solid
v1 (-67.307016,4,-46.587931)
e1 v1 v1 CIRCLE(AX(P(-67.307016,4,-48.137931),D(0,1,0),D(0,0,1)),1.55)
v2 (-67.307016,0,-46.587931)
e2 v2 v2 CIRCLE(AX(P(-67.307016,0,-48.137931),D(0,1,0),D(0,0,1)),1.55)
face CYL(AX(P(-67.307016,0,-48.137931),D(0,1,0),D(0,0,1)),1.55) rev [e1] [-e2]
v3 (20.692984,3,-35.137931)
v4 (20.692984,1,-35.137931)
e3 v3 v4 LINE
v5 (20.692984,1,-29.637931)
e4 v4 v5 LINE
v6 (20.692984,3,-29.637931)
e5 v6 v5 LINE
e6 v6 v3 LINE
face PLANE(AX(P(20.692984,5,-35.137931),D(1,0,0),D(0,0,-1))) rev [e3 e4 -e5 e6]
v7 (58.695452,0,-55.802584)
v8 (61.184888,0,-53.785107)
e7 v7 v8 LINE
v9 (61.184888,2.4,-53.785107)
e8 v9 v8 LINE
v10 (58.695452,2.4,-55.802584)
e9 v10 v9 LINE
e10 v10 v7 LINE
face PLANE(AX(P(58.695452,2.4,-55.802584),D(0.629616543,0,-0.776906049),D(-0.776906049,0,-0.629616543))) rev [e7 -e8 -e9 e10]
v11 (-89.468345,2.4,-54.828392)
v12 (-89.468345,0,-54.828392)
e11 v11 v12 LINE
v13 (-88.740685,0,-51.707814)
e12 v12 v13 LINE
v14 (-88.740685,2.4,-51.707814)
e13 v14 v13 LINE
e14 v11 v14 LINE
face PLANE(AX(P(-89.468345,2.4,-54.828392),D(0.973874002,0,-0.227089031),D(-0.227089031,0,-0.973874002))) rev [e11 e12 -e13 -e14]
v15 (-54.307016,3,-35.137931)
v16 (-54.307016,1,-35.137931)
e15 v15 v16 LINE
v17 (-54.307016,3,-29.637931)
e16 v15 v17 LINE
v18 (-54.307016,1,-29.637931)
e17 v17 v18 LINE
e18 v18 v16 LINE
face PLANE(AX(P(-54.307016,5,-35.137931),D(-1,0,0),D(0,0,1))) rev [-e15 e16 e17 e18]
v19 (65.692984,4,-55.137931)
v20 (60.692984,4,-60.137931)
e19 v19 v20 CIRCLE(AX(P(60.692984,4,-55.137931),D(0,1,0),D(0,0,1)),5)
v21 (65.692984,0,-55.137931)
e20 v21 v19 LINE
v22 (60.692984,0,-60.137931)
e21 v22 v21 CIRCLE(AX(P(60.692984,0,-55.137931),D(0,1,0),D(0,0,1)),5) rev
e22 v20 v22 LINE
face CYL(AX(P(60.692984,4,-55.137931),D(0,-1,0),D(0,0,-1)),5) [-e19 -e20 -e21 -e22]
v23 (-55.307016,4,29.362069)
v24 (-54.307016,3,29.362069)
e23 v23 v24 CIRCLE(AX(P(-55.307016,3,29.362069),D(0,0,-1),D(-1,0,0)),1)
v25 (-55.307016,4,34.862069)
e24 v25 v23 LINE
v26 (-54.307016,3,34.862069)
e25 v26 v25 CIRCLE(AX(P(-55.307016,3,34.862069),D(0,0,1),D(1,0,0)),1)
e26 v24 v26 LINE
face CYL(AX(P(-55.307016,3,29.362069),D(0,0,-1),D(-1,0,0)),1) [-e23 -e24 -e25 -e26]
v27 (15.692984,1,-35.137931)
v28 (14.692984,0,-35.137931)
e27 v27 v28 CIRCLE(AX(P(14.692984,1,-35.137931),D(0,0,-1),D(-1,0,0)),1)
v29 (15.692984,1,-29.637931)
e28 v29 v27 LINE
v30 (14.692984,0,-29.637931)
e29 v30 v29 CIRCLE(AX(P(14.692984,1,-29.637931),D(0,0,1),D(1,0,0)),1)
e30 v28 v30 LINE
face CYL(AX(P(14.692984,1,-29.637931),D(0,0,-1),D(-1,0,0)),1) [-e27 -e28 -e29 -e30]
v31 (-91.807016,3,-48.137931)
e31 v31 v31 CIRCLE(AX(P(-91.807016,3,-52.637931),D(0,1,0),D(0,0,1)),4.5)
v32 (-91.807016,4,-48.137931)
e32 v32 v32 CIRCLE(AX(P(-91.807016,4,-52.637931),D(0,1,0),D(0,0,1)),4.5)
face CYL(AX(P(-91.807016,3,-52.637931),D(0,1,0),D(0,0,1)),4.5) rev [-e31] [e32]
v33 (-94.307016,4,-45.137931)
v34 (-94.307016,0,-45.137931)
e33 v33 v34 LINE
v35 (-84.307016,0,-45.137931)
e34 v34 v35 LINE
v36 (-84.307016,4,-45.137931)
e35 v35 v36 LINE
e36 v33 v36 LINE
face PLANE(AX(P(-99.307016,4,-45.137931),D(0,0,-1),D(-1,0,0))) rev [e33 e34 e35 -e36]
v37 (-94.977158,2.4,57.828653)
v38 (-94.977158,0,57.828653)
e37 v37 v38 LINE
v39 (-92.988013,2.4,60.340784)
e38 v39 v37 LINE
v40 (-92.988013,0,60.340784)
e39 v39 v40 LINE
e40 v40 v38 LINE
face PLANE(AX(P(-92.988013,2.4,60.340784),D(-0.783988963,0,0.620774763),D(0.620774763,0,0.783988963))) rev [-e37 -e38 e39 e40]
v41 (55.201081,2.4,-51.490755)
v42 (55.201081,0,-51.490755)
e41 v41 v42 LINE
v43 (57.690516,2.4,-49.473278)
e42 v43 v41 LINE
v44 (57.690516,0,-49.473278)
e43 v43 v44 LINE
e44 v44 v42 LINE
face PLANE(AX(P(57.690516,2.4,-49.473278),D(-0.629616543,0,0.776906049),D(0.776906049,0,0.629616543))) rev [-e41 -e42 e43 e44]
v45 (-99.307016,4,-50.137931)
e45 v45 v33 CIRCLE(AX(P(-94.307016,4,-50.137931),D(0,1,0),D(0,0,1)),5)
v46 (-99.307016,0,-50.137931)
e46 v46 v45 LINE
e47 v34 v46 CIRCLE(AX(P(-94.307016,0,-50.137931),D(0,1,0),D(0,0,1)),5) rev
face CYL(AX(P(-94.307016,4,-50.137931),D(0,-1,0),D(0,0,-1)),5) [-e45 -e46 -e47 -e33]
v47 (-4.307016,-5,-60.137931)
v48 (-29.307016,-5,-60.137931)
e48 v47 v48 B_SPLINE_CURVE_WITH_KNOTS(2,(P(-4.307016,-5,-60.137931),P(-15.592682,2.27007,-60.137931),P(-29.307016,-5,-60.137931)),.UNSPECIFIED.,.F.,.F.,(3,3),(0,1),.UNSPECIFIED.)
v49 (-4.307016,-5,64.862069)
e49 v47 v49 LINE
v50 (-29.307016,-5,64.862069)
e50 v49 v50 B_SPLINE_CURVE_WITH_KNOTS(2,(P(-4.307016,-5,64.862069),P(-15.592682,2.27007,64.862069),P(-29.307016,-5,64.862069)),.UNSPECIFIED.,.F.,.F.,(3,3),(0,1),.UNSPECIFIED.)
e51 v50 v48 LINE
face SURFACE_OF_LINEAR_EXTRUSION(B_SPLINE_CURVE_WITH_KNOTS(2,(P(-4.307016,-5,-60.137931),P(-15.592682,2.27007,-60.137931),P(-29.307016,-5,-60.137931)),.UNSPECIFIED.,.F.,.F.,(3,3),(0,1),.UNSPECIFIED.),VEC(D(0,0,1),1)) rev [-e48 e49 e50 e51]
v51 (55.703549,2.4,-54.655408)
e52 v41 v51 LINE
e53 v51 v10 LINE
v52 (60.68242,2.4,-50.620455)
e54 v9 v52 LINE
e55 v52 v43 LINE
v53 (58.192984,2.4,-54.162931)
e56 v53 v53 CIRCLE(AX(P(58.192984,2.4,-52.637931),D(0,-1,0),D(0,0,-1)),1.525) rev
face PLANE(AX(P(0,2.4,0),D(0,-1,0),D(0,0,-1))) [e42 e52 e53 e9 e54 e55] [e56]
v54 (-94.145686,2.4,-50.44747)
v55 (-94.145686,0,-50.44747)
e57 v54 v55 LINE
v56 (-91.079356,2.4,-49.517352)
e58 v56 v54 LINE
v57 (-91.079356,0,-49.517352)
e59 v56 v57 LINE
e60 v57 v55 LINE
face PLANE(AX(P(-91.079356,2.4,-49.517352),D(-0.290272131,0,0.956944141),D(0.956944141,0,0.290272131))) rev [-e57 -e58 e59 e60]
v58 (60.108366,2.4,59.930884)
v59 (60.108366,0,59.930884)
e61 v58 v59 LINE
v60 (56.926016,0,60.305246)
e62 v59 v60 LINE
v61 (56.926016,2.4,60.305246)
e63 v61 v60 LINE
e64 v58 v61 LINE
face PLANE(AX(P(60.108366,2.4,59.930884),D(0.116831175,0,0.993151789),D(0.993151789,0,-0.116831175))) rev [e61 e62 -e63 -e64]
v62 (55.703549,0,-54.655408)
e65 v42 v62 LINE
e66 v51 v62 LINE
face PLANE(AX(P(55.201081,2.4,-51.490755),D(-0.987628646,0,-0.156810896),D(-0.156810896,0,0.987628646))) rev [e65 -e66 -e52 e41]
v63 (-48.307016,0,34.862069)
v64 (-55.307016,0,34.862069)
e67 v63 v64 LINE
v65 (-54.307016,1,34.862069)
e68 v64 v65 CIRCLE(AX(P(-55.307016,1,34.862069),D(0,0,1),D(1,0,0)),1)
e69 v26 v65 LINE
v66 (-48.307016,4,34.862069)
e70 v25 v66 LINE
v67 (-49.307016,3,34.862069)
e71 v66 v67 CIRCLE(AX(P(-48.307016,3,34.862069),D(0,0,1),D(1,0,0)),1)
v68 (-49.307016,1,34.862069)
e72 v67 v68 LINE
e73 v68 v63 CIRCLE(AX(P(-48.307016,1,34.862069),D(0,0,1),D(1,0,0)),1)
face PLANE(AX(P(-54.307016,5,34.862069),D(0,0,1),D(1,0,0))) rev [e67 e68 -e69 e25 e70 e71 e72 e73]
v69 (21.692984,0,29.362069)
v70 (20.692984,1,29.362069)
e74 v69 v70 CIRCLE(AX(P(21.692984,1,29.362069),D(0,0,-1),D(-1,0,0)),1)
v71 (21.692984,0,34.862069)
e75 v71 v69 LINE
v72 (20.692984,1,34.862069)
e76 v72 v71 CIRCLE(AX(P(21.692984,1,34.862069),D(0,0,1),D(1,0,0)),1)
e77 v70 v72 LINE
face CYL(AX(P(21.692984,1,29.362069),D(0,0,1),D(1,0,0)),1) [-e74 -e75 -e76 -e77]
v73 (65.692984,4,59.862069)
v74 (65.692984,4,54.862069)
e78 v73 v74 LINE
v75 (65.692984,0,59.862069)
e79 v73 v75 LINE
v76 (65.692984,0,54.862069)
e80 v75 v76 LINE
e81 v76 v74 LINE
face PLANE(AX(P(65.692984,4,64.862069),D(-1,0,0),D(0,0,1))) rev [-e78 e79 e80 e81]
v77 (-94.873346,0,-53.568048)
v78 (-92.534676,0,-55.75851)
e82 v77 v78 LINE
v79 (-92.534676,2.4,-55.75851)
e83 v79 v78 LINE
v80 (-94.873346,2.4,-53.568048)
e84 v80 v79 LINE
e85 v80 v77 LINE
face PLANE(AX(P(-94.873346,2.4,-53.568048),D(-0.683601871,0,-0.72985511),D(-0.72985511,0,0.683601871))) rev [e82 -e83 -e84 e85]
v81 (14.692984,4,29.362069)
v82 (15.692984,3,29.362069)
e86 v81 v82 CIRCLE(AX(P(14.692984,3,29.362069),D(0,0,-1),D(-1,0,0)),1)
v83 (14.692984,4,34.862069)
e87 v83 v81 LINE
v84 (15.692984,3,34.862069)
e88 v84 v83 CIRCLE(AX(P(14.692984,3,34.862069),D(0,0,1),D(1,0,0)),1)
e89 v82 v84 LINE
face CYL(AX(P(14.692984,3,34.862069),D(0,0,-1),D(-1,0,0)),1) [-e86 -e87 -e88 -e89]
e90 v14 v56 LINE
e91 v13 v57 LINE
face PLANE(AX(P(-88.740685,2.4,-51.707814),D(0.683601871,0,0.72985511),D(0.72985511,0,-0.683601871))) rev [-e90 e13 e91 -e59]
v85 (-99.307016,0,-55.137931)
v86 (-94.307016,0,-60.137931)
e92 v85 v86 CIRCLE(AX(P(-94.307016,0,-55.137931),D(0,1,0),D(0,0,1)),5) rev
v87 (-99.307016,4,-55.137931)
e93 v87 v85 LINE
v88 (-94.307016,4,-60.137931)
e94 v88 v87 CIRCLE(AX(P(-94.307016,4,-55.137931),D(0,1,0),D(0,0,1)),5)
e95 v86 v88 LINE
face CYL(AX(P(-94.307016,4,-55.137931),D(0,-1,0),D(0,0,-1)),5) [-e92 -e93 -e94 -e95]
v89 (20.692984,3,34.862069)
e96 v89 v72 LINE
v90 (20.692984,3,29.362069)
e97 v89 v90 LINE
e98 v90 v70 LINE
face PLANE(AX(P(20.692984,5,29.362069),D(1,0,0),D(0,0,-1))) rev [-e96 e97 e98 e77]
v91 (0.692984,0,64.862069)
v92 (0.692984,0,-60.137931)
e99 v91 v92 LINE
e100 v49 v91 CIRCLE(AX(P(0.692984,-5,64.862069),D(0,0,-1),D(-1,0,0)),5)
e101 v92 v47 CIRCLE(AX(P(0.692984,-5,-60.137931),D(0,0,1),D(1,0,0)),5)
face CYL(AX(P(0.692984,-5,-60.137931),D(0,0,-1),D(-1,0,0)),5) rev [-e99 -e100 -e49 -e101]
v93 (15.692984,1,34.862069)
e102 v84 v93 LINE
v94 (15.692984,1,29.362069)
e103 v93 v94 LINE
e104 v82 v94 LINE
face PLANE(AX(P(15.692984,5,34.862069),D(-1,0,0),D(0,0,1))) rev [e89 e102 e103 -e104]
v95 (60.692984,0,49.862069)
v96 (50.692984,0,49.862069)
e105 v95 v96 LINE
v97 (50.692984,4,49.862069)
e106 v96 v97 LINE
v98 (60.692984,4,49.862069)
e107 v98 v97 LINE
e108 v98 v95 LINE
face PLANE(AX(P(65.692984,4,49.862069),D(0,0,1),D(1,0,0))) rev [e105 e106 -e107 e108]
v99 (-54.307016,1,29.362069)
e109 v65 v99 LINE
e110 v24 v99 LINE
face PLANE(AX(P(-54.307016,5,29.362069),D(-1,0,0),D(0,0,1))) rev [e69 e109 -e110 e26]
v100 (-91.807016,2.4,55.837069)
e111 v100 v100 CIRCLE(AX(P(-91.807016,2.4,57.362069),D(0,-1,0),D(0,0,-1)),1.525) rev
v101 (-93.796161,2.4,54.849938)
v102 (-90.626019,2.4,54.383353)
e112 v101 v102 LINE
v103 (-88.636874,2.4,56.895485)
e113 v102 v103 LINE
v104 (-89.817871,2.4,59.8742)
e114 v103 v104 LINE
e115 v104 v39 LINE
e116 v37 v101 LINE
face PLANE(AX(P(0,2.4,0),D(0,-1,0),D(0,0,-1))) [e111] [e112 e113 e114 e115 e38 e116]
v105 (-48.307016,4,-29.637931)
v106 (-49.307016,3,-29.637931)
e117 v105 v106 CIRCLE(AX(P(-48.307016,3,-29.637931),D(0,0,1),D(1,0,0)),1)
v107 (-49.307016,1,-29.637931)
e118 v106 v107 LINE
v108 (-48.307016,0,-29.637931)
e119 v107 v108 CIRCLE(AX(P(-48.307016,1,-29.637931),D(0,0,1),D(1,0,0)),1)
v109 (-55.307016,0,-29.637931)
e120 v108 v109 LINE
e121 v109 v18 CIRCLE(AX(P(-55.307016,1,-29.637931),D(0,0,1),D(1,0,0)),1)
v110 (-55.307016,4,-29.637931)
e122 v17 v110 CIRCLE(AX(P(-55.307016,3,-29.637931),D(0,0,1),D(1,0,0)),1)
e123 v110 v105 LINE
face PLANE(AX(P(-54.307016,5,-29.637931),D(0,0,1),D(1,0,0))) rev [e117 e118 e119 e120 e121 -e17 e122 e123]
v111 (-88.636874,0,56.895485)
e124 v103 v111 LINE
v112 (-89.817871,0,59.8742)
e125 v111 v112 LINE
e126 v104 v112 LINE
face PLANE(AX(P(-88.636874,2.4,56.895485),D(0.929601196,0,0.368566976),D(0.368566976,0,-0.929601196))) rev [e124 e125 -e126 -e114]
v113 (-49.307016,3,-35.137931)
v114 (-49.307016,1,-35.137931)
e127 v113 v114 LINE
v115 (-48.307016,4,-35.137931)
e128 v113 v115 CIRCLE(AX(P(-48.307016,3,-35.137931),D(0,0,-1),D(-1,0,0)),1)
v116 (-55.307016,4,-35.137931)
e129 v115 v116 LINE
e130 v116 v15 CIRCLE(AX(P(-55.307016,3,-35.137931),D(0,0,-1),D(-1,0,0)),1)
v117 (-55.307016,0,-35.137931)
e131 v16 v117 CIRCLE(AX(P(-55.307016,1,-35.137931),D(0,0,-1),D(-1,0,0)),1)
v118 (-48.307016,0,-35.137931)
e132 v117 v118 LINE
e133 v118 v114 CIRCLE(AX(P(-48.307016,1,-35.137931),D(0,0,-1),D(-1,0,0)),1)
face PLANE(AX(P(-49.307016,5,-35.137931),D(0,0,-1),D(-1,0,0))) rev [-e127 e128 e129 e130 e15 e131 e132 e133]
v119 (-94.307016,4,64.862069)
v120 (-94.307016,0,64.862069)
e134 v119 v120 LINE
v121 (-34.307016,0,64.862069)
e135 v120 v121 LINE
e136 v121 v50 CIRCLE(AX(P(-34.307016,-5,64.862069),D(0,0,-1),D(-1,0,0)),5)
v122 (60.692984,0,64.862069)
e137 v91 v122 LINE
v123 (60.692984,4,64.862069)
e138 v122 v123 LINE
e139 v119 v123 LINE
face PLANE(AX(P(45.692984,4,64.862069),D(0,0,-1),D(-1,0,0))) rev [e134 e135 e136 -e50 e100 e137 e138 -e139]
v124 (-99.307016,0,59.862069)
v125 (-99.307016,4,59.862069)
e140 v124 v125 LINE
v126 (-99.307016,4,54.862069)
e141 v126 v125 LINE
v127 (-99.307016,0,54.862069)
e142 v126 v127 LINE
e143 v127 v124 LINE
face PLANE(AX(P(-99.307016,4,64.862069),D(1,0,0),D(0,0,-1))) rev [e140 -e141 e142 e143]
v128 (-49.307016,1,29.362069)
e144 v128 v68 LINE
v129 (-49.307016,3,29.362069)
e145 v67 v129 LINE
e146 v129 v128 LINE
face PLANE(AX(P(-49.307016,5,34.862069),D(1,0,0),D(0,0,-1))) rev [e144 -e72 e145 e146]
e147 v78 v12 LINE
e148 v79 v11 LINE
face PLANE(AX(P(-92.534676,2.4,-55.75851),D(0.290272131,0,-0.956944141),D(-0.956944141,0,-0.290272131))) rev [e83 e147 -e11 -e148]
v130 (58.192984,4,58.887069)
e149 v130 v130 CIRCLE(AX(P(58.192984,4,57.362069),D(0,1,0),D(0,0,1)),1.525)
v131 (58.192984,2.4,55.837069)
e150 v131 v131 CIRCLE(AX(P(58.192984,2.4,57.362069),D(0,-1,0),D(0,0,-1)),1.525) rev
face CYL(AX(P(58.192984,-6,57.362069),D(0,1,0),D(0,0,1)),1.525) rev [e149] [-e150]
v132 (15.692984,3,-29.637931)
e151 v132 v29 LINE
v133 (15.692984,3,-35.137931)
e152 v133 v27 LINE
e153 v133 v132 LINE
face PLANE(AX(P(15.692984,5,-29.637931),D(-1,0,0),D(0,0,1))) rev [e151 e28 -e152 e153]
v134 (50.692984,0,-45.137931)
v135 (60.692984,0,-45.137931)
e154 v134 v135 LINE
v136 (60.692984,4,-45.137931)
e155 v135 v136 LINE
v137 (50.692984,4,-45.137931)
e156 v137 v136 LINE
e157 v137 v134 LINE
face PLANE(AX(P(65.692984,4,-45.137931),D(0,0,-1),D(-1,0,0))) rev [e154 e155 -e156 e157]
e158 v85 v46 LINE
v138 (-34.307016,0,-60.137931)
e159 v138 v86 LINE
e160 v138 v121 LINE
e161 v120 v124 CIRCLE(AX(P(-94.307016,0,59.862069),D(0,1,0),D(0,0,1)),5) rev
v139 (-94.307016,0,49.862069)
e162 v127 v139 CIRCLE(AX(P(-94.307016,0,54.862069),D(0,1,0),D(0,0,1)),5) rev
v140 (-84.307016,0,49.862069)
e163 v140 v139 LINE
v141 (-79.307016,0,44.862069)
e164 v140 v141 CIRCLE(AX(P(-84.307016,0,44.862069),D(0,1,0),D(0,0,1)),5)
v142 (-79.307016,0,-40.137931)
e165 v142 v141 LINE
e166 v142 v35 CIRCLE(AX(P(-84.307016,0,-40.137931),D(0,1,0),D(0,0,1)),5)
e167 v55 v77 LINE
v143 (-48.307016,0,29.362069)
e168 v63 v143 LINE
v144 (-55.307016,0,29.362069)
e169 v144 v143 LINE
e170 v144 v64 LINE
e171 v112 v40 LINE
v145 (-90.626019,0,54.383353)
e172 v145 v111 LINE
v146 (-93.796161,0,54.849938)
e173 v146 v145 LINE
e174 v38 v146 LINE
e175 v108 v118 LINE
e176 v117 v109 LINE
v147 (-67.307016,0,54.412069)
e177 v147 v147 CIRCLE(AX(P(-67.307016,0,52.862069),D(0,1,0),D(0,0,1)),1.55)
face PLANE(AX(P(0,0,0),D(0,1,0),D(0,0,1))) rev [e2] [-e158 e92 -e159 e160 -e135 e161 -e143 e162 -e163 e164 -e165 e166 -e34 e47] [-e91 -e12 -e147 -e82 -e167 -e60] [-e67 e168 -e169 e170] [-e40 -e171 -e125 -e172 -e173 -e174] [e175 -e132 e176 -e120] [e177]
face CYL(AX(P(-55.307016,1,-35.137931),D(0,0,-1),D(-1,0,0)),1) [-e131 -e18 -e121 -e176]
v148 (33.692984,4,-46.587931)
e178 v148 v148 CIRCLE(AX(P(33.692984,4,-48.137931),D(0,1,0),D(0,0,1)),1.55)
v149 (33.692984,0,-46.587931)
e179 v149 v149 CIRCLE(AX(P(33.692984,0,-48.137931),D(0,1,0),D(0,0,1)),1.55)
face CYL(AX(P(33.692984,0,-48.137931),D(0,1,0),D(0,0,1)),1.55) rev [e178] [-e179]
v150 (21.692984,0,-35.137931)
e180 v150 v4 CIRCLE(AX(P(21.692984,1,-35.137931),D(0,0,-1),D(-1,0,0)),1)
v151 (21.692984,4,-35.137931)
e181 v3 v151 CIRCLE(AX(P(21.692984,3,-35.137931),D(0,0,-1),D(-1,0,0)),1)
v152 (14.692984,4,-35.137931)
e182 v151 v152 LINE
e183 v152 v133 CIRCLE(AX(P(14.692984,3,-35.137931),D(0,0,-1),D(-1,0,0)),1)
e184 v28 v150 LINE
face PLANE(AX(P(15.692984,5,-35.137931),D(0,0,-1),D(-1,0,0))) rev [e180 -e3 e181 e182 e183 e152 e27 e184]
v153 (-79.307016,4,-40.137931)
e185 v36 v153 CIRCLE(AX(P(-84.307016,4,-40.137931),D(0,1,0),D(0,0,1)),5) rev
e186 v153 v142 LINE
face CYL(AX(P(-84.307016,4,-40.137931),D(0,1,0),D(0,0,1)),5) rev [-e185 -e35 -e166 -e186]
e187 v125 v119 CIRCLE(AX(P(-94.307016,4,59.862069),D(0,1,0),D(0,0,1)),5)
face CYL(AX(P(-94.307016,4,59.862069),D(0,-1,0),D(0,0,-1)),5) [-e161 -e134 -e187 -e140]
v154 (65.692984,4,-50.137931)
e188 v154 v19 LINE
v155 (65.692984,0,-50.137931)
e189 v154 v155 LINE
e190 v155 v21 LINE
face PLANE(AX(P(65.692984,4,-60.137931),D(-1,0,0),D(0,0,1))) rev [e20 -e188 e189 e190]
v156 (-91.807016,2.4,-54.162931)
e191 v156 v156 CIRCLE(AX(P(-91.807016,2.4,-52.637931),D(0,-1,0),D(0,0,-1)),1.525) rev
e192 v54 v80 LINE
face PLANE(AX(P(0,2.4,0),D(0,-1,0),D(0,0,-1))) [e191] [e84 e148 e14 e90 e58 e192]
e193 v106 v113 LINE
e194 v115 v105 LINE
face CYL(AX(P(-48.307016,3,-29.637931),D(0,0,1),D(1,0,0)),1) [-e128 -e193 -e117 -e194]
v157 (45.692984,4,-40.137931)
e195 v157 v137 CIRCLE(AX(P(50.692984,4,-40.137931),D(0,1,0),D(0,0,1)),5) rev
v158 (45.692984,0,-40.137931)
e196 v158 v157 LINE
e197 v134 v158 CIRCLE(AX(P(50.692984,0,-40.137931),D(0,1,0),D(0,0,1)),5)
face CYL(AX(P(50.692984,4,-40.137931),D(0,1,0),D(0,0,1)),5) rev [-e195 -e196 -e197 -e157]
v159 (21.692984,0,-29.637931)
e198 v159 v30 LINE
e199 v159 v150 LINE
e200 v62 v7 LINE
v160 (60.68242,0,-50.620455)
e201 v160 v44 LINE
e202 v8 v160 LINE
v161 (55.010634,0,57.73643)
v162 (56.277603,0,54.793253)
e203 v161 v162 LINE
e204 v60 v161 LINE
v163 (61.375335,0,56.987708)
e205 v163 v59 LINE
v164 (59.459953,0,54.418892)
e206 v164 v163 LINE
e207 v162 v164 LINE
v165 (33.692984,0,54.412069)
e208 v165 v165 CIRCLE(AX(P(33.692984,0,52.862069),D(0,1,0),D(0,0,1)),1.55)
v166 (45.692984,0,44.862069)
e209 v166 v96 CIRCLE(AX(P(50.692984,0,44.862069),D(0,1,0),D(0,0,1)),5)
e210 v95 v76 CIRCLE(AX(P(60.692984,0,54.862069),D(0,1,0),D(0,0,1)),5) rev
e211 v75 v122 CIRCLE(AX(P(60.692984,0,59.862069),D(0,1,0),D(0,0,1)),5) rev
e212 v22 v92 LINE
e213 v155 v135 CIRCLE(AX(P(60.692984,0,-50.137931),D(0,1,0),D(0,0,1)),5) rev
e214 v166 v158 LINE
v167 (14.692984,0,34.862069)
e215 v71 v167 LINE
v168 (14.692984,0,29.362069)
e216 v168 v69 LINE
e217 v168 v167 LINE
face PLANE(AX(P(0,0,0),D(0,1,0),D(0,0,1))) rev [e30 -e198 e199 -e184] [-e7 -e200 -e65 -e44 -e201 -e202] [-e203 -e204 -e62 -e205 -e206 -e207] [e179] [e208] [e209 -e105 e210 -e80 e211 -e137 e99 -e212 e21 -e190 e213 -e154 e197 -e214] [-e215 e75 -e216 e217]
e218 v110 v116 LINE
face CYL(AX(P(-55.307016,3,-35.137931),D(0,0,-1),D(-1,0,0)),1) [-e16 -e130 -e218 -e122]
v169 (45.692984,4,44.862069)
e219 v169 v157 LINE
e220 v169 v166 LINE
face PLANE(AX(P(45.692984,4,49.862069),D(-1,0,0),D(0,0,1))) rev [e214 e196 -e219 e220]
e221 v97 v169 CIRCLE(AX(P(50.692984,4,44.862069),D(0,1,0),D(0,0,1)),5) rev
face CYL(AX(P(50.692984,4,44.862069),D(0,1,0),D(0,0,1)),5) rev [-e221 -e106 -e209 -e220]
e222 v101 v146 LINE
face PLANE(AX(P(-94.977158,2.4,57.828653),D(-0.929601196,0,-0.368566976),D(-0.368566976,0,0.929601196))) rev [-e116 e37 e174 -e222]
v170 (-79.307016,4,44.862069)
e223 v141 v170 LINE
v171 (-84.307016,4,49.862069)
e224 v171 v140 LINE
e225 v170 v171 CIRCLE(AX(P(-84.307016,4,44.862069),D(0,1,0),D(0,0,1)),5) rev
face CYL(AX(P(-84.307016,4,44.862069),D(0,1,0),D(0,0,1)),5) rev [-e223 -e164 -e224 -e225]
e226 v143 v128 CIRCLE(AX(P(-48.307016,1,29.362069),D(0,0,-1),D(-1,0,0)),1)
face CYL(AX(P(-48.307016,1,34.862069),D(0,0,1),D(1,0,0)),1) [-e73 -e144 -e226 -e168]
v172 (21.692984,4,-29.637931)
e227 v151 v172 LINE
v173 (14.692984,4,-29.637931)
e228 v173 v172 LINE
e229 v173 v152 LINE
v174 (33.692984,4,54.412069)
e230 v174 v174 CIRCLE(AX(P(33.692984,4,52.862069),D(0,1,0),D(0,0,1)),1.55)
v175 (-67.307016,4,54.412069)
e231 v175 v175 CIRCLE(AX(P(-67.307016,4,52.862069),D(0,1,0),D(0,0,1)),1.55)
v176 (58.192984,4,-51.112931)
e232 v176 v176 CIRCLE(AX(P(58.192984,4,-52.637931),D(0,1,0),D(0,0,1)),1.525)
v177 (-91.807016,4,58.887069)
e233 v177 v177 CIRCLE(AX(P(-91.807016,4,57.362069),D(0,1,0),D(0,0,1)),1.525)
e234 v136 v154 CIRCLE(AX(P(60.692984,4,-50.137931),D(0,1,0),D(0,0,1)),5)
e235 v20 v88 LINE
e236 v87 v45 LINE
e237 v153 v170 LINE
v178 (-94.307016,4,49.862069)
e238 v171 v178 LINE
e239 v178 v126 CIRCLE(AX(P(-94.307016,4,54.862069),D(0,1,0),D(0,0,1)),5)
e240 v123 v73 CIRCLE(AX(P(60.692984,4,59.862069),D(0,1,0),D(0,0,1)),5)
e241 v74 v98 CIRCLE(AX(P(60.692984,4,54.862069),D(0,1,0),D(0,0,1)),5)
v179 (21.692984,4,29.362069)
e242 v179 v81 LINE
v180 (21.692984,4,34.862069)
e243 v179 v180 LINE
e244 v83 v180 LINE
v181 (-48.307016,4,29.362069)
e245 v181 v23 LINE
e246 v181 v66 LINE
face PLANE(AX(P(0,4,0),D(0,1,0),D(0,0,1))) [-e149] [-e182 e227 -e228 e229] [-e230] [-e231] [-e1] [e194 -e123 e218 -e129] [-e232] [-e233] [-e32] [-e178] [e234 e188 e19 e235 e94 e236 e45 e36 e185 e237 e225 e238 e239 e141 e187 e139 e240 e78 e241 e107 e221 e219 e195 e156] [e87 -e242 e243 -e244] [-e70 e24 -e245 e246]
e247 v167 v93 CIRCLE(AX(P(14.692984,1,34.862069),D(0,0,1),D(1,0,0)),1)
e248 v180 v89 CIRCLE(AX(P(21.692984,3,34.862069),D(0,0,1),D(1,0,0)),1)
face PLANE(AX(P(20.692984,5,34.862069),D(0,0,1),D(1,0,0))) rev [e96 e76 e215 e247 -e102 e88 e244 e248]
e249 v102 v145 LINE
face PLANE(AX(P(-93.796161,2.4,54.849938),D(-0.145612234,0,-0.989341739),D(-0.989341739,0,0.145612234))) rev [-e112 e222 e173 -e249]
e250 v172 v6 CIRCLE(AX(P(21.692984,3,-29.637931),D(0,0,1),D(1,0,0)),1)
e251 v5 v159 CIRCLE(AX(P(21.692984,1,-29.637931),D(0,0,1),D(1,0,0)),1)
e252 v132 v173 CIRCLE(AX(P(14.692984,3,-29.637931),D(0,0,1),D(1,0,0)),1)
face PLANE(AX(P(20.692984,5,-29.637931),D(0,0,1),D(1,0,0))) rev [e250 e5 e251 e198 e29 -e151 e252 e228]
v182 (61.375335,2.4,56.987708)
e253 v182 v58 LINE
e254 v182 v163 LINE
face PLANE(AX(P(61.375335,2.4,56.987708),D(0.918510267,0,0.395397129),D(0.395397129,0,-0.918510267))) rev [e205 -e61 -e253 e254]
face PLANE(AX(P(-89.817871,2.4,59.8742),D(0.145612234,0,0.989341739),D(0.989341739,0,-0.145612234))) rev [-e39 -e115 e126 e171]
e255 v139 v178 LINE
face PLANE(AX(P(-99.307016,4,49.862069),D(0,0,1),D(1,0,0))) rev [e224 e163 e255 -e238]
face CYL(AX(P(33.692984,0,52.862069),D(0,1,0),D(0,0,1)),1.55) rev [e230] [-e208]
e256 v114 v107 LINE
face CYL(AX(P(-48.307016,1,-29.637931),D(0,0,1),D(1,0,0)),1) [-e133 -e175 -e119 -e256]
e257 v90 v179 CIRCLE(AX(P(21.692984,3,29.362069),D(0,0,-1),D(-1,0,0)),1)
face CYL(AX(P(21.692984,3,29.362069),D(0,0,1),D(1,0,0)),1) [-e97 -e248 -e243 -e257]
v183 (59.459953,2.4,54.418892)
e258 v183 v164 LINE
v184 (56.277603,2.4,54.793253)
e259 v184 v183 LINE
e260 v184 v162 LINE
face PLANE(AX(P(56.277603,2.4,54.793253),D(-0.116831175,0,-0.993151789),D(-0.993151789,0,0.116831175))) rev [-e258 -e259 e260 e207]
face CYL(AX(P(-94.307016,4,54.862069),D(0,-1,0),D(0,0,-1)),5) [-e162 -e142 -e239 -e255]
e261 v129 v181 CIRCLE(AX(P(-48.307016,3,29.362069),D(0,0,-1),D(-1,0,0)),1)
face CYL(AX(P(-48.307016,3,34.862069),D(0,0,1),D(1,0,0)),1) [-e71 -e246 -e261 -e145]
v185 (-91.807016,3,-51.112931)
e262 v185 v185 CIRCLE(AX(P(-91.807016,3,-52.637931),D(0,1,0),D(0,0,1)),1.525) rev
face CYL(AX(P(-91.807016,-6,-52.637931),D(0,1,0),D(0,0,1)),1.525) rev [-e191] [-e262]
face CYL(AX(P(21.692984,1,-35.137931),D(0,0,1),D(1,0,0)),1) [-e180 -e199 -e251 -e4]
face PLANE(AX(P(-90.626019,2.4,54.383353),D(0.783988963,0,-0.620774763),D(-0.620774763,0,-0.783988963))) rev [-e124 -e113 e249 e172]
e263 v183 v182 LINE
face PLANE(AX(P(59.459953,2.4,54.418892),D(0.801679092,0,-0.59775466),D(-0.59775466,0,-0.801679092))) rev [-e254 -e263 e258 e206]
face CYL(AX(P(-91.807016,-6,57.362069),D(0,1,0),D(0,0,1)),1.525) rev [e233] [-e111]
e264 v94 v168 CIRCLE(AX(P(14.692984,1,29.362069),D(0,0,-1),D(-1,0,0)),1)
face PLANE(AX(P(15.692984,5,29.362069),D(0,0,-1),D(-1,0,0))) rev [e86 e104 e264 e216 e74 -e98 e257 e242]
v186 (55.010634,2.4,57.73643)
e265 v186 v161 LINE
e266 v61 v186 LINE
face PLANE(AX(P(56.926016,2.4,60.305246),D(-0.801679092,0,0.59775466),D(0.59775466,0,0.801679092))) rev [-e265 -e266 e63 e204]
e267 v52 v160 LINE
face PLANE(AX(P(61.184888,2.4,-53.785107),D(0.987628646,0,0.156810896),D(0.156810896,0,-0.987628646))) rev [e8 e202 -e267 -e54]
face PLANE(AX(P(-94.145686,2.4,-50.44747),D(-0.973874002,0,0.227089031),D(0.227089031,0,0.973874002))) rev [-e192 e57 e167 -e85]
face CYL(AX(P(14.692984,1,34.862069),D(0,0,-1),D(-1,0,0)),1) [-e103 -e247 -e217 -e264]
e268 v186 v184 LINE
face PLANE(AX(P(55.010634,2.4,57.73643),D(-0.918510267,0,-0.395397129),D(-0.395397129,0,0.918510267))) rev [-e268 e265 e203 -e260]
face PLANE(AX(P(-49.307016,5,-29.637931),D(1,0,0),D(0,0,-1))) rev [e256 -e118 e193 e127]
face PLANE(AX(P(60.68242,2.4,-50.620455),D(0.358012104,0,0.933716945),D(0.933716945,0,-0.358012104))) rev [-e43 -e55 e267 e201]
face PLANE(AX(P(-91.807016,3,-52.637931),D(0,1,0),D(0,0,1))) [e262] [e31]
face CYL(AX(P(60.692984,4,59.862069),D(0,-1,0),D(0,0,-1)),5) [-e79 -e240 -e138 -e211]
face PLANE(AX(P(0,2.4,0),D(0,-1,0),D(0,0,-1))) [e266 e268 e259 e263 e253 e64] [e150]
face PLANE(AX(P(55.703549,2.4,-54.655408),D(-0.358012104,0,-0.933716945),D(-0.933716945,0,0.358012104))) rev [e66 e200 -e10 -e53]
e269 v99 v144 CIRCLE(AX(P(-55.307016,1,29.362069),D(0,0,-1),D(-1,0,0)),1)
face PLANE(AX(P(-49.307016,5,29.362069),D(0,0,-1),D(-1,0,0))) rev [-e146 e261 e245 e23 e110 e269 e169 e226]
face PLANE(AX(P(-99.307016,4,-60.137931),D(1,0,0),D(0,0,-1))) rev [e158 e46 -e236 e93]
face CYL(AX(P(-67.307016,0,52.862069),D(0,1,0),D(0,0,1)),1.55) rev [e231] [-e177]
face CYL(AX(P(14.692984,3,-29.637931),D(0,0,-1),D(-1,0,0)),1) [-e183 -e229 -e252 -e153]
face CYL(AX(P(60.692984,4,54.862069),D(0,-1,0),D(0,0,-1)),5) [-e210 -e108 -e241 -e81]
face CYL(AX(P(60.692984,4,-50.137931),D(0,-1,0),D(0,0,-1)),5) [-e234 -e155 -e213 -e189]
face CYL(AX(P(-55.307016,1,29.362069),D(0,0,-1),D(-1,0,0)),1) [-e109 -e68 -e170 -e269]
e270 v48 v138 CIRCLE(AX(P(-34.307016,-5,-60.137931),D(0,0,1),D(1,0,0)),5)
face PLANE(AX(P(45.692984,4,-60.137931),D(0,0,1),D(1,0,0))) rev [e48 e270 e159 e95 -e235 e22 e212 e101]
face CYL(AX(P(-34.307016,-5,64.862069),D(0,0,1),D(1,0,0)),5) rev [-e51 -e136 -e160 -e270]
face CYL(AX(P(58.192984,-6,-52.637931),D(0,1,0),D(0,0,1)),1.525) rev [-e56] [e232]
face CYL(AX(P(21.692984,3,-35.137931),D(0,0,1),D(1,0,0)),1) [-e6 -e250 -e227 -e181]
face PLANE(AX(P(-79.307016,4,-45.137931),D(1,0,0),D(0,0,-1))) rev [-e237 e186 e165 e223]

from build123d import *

# Parameters (mm, degrees)
BOSS_EXTRUDE1_DEPTH = 4
SKETCH2_R           = 1.55
CUT_EXTRUDE3_DEPTH  = 119.680122062
FILLET1_R           = 5
SKETCH5_R           = 1.525
CUT_EXTRUDE4_DEPTH  = 10
SKETCH5_3_R         = 4.5
CUT_EXTRUDE5_DEPTH  = 1
CUT_EXTRUDE6_DEPTH  = 2.4
SKETCH8_W           = 25
SKETCH8_H           = 125
BOSS_EXTRUDE4_DEPTH = 5
CUT_EXTRUDE7_DEPTH  = 160.724398205
FILLET5_R           = 5
SKETCH10_W          = 5
SKETCH10_H          = 5.5
CUT_EXTRUDE8_DEPTH  = 5
FILLET7_R           = 1


with BuildPart() as part:
    # Sketch1 → Boss-Extrude1 (new body)
    with BuildSketch(Plane(origin=(0, 0, 0), x_dir=(1, 0, 0), z_dir=(0, 1, 0))):
        Polygon((-79.307015775, 45.137931034), (-79.307015775, -49.862068966), (-99.307015775, -49.862068966), (-99.307015775, -64.862068966), (-68.307015775, -64.862068966), (45.692984225, -64.862068966), (65.692984225, -64.862068966), (65.692984225, -49.862068966), (45.692984225, -49.862068966), (45.692984225, 45.137931034), (65.692984225, 45.137931034), (65.692984225, 60.137931034), (45.692984225, 60.137931034), (-68.307015775, 60.137931034), (-99.307015775, 60.137931034), (-99.307015775, 45.137931034), align=None)
    extrude(amount=BOSS_EXTRUDE1_DEPTH)

    # Sketch2 → Cut-Extrude3 (cut, through all)
    with BuildSketch(Plane(origin=(0, 4, 0), x_dir=(1, 0, 0), z_dir=(0, 1, 0))):
        with Locations(Location((33.692984225, 48.137931034, 0), (0, 0, 270))):
            Circle(SKETCH2_R)
        with Locations(Location((-67.307015775, 48.137931034, 0), (0, 0, 270))):
            Circle(SKETCH2_R)
        with Locations(Location((-67.307015775, -52.862068966, 0), (0, 0, 270))):
            Circle(SKETCH2_R)
        with Locations(Location((33.692984225, -52.862068966, 0), (0, 0, 270))):
            Circle(SKETCH2_R)
    extrude(amount=-CUT_EXTRUDE3_DEPTH, mode=Mode.SUBTRACT)

    # Fillet1
    fillet1_edges = [part.edges().sort_by_distance(p)[0] for p in [
        (65.692984225, 2, -60.137931034),
        (65.692984225, 2, -45.137931034),
        (45.692984225, 2, -45.137931034),
        (45.692984225, 2, 49.862068966),
        (65.692984225, 2, 49.862068966),
        (65.692984225, 2, 64.862068966),
        (-99.307015775, 2, 64.862068966),
        (-99.307015775, 2, 49.862068966),
        (-79.307015775, 2, 49.862068966),
        (-79.307015775, 2, -45.137931034),
        (-99.307015775, 2, -45.137931034),
        (-99.307015775, 2, -60.137931034),
    ]]
    fillet(fillet1_edges, radius=FILLET1_R)

    # Sketch5 → Cut-Extrude4 (cut)
    with BuildSketch(Plane(origin=(0, 4, 0), x_dir=(1, 0, 0), z_dir=(0, 1, 0))):
        with Locations(Location((-91.807015775, 52.637931034, 0), (0, 0, 270))):
            Circle(SKETCH5_R)
        with Locations(Location((-91.807015775, -57.362068966, 0), (0, 0, 270))):
            Circle(SKETCH5_R)
        with Locations(Location((58.192984225, -57.362068966, 0), (0, 0, 270))):
            Circle(SKETCH5_R)
        with Locations(Location((58.192984225, 52.637931034, 0), (0, 0, 270))):
            Circle(SKETCH5_R)
    extrude(amount=-CUT_EXTRUDE4_DEPTH, mode=Mode.SUBTRACT)

    # Sketch5<3> → Cut-Extrude5 (cut)
    with BuildSketch(Plane(origin=(0, 4, 0), x_dir=(1, 0, 0), z_dir=(0, 1, 0))):
        with Locations(Location((-91.807015775, 52.637931034, 0), (0, 0, 270))):
            Circle(SKETCH5_3_R)
    extrude(amount=-CUT_EXTRUDE5_DEPTH, mode=Mode.SUBTRACT)

    # Sketch6 → Cut-Extrude6 (cut)
    with BuildSketch(Plane.XZ):
        Polygon((-88.636873981, 56.89548456), (-89.81787093, 59.87420009), (-92.988012724, 60.340784495), (-94.977157568, 57.828653371), (-93.79616062, 54.849937841), (-90.626018826, 54.383353436), align=None)
        Polygon((61.375334539, 56.987707532), (60.108365894, 59.930884464), (56.92601558, 60.305245897), (55.010633912, 57.736430399), (56.277602557, 54.793253467), (59.459952871, 54.418892034), align=None)
        Polygon((60.682419613, -50.620454529), (57.690516013, -49.473278495), (55.201080626, -51.490755001), (55.703548838, -54.65540754), (58.695452437, -55.802583574), (61.184887825, -53.785107068), align=None)
        Polygon((-88.740685409, -51.707813788), (-91.079355756, -49.517352419), (-94.145686121, -50.447469665), (-94.87334614, -53.568048281), (-92.534675794, -55.75850965), (-89.468345428, -54.828392404), align=None)
    extrude(amount=-CUT_EXTRUDE6_DEPTH, mode=Mode.SUBTRACT)

    # Sketch8 → Boss-Extrude4 (add)
    with BuildSketch(Plane.XZ):
        with Locations((-16.807015775, 2.362068966)):
            Rectangle(SKETCH8_W, SKETCH8_H)
    extrude(amount=BOSS_EXTRUDE4_DEPTH)

    # Sketch9 → Cut-Extrude7 (cut, through all)
    with BuildSketch(Plane.XY.offset(64.862068966)):
        with BuildLine():
            Line((-4.307015775, -5), (-29.307015775, -5))
            add(Edge.make_bspline(
                [(-4.307015775, -5), (-15.592681682, 2.270069745), (-29.307015775, -5)],
                knots=[0, 0, 0, 1, 1, 1], degree=2))
        make_face()
    extrude(amount=-CUT_EXTRUDE7_DEPTH, mode=Mode.SUBTRACT)

    # Fillet5
    fillet5_edges = [part.edges().sort_by_distance(p)[0] for p in [
        (-29.307015775, 0, 2.362068966),
        (-4.307015775, 0, 2.362068966),
    ]]
    fillet(fillet5_edges, radius=FILLET5_R - 0.0001)  # a hair under: the kernel refuses the full size

    # Sketch10 → Cut-Extrude8 (cut)
    with BuildSketch(Plane.XZ):
        with Locations((18.192984225, -32.387931034)):
            Rectangle(SKETCH10_W, SKETCH10_H)
        with Locations((18.192984225, 32.112068966)):
            Rectangle(SKETCH10_W, SKETCH10_H)
        with Locations((-51.807015775, 32.112068966)):
            Rectangle(SKETCH10_W, SKETCH10_H)
        with Locations((-51.807015775, -32.387931034)):
            Rectangle(SKETCH10_W, SKETCH10_H)
    extrude(amount=-CUT_EXTRUDE8_DEPTH, mode=Mode.SUBTRACT)

    # Fillet7
    fillet7_edges = [part.edges().sort_by_distance(p)[0] for p in [
        (20.692984225, 4, -32.387931034),
        (15.692984225, 4, -32.387931034),
        (20.692984225, 0, -32.387931034),
        (15.692984225, 0, -32.387931034),
        (-54.307015775, 4, -32.387931034),
        (-49.307015775, 4, -32.387931034),
        (-54.307015775, 4, 32.112068966),
        (-49.307015775, 4, 32.112068966),
        (20.692984225, 4, 32.112068966),
        (15.692984225, 4, 32.112068966),
        (20.692984225, 0, 32.112068966),
        (15.692984225, 0, 32.112068966),
        (-49.307015775, 0, 32.112068966),
        (-54.307015775, 0, 32.112068966),
        (-49.307015775, 0, -32.387931034),
        (-54.307015775, 0, -32.387931034),
    ]]
    fillet(fillet7_edges, radius=FILLET7_R)


solid = part.part
